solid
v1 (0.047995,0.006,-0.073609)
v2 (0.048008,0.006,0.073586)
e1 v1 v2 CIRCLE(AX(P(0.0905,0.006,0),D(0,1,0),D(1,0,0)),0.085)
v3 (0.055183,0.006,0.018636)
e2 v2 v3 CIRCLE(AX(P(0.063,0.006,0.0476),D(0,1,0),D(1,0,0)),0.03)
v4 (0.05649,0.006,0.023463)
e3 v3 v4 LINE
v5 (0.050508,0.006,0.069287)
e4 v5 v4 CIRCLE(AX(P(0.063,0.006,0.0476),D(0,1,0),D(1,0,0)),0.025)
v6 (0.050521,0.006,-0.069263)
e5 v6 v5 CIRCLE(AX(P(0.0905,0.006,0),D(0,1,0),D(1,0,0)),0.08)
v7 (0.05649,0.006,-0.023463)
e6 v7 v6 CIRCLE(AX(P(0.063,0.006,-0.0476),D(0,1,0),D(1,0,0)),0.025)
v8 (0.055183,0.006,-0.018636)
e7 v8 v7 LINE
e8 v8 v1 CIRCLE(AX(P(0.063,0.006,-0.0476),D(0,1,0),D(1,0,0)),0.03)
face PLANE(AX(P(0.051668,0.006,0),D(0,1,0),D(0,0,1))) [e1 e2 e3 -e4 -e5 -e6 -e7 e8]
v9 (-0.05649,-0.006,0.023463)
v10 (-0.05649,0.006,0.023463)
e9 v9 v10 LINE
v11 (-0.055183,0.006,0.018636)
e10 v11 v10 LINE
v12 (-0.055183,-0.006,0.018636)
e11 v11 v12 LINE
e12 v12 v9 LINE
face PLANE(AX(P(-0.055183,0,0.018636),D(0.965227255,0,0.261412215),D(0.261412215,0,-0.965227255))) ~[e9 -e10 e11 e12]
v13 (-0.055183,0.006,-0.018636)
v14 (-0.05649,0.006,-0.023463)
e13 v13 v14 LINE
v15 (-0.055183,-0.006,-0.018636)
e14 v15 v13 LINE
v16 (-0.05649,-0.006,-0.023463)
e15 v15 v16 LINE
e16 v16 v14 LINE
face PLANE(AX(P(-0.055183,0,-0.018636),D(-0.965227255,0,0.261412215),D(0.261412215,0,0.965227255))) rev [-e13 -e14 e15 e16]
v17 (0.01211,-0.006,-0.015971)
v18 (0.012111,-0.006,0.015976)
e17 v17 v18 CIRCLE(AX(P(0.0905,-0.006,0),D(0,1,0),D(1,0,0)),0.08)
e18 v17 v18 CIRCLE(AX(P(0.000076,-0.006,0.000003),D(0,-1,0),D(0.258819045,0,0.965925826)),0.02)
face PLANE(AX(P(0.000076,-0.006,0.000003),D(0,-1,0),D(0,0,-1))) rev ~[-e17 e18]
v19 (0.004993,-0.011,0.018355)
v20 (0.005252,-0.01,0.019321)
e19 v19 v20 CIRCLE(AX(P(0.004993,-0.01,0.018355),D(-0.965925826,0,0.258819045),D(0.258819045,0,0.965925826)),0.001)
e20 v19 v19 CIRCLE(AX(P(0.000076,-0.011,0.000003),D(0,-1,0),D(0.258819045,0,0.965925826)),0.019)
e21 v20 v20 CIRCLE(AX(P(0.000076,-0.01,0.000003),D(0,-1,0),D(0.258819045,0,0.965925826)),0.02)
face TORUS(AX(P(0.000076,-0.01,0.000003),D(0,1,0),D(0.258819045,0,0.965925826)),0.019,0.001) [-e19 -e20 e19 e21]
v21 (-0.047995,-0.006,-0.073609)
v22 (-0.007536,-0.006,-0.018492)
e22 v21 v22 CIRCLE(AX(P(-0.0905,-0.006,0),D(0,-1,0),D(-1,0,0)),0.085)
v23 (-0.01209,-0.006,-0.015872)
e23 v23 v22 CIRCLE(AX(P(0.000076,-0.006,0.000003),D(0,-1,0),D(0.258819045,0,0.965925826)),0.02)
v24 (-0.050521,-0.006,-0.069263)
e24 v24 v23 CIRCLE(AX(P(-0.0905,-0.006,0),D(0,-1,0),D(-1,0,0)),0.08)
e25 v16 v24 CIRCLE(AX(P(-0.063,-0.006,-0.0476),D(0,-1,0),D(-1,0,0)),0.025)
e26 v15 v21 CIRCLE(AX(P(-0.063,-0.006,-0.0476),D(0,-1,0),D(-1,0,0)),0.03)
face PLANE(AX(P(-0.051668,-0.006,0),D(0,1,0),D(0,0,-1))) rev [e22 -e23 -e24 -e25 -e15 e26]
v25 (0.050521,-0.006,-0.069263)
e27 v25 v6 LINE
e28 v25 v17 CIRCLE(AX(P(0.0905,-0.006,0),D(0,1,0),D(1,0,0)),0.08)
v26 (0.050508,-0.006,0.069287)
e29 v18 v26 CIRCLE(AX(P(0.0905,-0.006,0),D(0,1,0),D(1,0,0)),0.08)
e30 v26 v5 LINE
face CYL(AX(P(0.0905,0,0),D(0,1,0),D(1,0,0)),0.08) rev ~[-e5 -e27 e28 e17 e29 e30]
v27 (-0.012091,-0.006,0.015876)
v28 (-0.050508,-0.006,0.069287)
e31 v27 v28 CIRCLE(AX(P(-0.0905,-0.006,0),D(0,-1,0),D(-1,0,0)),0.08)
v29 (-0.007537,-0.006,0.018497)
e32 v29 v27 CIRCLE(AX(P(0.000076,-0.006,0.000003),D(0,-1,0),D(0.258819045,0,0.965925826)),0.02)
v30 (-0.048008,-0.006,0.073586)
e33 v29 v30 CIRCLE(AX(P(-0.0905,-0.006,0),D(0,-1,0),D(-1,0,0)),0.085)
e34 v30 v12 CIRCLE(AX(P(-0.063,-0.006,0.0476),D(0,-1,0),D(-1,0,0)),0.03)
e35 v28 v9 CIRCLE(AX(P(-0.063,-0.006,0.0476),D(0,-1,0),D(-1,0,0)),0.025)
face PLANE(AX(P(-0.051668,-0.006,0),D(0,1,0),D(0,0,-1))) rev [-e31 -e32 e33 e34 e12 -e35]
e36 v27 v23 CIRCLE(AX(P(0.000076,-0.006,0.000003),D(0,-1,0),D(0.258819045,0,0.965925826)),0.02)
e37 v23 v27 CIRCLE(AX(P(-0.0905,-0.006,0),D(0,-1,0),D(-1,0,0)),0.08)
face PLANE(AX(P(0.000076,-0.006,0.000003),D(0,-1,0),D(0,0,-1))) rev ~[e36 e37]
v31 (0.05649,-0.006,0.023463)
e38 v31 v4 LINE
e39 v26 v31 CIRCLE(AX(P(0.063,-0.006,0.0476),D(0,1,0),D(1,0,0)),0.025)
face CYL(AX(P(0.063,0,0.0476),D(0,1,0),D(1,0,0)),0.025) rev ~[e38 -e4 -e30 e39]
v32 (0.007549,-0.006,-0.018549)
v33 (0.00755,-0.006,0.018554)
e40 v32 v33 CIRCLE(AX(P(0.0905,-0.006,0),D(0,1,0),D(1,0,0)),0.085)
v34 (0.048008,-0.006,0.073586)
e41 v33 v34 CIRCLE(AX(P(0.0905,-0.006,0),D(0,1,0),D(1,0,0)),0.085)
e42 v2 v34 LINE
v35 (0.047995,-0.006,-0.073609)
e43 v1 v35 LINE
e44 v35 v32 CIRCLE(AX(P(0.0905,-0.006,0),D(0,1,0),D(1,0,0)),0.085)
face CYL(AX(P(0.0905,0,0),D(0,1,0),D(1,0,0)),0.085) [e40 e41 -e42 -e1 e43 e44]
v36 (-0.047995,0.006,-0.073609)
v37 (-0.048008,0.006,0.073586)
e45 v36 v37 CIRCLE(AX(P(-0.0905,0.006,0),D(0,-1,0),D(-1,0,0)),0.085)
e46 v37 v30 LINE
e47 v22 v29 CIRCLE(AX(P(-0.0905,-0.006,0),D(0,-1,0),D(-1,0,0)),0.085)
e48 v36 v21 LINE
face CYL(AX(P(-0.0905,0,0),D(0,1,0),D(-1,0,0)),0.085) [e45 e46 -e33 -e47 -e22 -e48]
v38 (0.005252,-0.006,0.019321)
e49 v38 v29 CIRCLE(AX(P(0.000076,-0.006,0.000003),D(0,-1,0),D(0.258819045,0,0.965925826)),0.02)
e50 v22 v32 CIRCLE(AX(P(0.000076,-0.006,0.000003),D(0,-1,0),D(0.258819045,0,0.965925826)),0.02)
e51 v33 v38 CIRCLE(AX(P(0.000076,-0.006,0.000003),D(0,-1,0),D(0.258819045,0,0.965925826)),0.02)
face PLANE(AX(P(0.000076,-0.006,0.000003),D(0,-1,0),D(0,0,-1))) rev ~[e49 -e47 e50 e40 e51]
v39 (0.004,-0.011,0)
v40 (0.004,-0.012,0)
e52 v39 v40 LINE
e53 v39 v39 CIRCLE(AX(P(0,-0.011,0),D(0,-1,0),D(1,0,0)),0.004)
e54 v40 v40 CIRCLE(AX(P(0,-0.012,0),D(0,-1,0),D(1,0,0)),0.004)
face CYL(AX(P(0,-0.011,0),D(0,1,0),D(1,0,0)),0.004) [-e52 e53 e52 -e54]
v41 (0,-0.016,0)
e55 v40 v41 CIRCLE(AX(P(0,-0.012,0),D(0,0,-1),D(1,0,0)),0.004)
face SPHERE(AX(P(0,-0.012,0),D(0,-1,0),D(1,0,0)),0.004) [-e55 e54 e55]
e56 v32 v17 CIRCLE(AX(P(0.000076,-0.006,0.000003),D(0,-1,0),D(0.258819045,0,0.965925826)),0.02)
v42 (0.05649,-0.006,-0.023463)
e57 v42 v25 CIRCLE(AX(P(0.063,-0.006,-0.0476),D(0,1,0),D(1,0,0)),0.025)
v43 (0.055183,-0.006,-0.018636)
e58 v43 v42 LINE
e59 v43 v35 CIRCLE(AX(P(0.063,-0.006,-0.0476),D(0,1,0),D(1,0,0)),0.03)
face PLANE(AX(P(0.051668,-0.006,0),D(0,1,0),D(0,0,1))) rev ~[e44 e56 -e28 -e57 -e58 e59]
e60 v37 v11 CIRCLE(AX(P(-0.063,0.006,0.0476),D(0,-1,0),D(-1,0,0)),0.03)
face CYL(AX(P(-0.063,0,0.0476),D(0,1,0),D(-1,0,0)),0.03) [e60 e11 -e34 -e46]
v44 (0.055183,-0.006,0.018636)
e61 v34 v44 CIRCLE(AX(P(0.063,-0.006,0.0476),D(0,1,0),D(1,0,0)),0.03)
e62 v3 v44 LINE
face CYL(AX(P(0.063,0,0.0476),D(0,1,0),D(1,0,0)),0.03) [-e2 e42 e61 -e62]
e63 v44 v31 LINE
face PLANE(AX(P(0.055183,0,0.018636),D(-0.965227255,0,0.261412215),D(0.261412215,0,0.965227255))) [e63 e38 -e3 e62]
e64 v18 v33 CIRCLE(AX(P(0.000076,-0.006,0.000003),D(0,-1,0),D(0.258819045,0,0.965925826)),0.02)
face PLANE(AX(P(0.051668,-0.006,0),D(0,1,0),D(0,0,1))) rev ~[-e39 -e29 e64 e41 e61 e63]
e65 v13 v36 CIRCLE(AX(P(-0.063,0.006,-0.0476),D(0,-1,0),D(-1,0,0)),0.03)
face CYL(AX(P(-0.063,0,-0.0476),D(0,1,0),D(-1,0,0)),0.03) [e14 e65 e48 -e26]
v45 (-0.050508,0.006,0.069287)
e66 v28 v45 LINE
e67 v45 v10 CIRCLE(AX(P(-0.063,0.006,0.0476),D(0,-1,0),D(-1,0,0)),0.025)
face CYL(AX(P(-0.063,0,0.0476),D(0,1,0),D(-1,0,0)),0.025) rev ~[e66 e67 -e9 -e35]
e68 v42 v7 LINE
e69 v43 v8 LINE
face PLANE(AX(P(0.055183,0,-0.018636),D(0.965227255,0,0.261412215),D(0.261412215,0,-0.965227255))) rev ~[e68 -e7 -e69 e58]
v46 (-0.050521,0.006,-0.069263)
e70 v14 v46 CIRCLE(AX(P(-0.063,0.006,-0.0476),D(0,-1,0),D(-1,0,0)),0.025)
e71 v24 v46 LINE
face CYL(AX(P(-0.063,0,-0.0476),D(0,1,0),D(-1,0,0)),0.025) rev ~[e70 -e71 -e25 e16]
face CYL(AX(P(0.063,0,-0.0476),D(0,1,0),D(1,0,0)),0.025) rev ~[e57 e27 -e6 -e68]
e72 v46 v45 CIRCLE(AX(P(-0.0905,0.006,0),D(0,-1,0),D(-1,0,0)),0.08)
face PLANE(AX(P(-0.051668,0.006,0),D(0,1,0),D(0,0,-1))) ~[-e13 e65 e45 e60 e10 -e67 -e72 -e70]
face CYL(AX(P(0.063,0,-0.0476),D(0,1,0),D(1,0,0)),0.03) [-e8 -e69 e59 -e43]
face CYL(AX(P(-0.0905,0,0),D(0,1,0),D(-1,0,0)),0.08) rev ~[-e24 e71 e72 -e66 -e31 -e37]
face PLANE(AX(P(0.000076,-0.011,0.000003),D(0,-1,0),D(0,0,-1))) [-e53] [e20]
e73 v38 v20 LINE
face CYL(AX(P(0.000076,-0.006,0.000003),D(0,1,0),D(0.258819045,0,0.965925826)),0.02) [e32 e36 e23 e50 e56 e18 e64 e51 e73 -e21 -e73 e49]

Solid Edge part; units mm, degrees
sketch "Sketch1" plane through (0, 0, 0) normal (0, -1, 0) x (1, 0, 0)
  line L0 (0.0552, 0.0187) -> (0.0565, 0.0235)
  arc A0 (0.048, 0.0736) -> (0.0552, 0.0187) centre (0.063, 0.0476) cw
  arc A1 (0.048, -0.0736) -> (0.048, 0.0736) centre (0.0905, 0) cw
  arc A2 (0.0552, -0.0187) -> (0.048, -0.0736) centre (0.063, -0.0476) cw
  line L1 (0.0552, -0.0187) -> (0.0565, -0.0235)
  arc A3 (0.0565, -0.0235) -> (0.0505, -0.0693) centre (0.063, -0.0476) cw
  arc A4 (0.0505, -0.0693) -> (0.0505, 0.0693) centre (0.0905, 0) cw
  arc A5 (0.0505, 0.0693) -> (0.0565, 0.0235) centre (0.063, 0.0476) cw
extrude "Protrusion1" add sketch "Sketch1" along normal mid plane 0.012
mirror "Mirror1" about plane through (0, 0, 0) normal (1, 0, 0) of "Protrusion1"
sketch "Sketch2" plane through (0.0507, -0.006, 0) normal (0, -1, 0) x (0.258819, 0, 0.9659258)
  circle A0 centre (-0.0131, 0.0489) radius 0.02
  dimension "D1" = 0.04
extrude "Ausprägung_2" add sketch "Sketch2" along normal blind 0.005
sketch "Sketch3" plane through (0, -0.011, 0) normal (0, -1, 0) x (1, 0, 0)
  circle A0 centre (0, 0) radius 0.004
  dimension "D1" = 0.008
extrude "Ausprägung_3" add sketch "Sketch3" along normal blind 0.005
fillet "Verrundung_1" radius 0.004 1 edges at (-0.004, -0.016, 0)
fillet "Verrundung_2" radius 0.001 1 edges at (-0.0052, -0.011, -0.0193)
